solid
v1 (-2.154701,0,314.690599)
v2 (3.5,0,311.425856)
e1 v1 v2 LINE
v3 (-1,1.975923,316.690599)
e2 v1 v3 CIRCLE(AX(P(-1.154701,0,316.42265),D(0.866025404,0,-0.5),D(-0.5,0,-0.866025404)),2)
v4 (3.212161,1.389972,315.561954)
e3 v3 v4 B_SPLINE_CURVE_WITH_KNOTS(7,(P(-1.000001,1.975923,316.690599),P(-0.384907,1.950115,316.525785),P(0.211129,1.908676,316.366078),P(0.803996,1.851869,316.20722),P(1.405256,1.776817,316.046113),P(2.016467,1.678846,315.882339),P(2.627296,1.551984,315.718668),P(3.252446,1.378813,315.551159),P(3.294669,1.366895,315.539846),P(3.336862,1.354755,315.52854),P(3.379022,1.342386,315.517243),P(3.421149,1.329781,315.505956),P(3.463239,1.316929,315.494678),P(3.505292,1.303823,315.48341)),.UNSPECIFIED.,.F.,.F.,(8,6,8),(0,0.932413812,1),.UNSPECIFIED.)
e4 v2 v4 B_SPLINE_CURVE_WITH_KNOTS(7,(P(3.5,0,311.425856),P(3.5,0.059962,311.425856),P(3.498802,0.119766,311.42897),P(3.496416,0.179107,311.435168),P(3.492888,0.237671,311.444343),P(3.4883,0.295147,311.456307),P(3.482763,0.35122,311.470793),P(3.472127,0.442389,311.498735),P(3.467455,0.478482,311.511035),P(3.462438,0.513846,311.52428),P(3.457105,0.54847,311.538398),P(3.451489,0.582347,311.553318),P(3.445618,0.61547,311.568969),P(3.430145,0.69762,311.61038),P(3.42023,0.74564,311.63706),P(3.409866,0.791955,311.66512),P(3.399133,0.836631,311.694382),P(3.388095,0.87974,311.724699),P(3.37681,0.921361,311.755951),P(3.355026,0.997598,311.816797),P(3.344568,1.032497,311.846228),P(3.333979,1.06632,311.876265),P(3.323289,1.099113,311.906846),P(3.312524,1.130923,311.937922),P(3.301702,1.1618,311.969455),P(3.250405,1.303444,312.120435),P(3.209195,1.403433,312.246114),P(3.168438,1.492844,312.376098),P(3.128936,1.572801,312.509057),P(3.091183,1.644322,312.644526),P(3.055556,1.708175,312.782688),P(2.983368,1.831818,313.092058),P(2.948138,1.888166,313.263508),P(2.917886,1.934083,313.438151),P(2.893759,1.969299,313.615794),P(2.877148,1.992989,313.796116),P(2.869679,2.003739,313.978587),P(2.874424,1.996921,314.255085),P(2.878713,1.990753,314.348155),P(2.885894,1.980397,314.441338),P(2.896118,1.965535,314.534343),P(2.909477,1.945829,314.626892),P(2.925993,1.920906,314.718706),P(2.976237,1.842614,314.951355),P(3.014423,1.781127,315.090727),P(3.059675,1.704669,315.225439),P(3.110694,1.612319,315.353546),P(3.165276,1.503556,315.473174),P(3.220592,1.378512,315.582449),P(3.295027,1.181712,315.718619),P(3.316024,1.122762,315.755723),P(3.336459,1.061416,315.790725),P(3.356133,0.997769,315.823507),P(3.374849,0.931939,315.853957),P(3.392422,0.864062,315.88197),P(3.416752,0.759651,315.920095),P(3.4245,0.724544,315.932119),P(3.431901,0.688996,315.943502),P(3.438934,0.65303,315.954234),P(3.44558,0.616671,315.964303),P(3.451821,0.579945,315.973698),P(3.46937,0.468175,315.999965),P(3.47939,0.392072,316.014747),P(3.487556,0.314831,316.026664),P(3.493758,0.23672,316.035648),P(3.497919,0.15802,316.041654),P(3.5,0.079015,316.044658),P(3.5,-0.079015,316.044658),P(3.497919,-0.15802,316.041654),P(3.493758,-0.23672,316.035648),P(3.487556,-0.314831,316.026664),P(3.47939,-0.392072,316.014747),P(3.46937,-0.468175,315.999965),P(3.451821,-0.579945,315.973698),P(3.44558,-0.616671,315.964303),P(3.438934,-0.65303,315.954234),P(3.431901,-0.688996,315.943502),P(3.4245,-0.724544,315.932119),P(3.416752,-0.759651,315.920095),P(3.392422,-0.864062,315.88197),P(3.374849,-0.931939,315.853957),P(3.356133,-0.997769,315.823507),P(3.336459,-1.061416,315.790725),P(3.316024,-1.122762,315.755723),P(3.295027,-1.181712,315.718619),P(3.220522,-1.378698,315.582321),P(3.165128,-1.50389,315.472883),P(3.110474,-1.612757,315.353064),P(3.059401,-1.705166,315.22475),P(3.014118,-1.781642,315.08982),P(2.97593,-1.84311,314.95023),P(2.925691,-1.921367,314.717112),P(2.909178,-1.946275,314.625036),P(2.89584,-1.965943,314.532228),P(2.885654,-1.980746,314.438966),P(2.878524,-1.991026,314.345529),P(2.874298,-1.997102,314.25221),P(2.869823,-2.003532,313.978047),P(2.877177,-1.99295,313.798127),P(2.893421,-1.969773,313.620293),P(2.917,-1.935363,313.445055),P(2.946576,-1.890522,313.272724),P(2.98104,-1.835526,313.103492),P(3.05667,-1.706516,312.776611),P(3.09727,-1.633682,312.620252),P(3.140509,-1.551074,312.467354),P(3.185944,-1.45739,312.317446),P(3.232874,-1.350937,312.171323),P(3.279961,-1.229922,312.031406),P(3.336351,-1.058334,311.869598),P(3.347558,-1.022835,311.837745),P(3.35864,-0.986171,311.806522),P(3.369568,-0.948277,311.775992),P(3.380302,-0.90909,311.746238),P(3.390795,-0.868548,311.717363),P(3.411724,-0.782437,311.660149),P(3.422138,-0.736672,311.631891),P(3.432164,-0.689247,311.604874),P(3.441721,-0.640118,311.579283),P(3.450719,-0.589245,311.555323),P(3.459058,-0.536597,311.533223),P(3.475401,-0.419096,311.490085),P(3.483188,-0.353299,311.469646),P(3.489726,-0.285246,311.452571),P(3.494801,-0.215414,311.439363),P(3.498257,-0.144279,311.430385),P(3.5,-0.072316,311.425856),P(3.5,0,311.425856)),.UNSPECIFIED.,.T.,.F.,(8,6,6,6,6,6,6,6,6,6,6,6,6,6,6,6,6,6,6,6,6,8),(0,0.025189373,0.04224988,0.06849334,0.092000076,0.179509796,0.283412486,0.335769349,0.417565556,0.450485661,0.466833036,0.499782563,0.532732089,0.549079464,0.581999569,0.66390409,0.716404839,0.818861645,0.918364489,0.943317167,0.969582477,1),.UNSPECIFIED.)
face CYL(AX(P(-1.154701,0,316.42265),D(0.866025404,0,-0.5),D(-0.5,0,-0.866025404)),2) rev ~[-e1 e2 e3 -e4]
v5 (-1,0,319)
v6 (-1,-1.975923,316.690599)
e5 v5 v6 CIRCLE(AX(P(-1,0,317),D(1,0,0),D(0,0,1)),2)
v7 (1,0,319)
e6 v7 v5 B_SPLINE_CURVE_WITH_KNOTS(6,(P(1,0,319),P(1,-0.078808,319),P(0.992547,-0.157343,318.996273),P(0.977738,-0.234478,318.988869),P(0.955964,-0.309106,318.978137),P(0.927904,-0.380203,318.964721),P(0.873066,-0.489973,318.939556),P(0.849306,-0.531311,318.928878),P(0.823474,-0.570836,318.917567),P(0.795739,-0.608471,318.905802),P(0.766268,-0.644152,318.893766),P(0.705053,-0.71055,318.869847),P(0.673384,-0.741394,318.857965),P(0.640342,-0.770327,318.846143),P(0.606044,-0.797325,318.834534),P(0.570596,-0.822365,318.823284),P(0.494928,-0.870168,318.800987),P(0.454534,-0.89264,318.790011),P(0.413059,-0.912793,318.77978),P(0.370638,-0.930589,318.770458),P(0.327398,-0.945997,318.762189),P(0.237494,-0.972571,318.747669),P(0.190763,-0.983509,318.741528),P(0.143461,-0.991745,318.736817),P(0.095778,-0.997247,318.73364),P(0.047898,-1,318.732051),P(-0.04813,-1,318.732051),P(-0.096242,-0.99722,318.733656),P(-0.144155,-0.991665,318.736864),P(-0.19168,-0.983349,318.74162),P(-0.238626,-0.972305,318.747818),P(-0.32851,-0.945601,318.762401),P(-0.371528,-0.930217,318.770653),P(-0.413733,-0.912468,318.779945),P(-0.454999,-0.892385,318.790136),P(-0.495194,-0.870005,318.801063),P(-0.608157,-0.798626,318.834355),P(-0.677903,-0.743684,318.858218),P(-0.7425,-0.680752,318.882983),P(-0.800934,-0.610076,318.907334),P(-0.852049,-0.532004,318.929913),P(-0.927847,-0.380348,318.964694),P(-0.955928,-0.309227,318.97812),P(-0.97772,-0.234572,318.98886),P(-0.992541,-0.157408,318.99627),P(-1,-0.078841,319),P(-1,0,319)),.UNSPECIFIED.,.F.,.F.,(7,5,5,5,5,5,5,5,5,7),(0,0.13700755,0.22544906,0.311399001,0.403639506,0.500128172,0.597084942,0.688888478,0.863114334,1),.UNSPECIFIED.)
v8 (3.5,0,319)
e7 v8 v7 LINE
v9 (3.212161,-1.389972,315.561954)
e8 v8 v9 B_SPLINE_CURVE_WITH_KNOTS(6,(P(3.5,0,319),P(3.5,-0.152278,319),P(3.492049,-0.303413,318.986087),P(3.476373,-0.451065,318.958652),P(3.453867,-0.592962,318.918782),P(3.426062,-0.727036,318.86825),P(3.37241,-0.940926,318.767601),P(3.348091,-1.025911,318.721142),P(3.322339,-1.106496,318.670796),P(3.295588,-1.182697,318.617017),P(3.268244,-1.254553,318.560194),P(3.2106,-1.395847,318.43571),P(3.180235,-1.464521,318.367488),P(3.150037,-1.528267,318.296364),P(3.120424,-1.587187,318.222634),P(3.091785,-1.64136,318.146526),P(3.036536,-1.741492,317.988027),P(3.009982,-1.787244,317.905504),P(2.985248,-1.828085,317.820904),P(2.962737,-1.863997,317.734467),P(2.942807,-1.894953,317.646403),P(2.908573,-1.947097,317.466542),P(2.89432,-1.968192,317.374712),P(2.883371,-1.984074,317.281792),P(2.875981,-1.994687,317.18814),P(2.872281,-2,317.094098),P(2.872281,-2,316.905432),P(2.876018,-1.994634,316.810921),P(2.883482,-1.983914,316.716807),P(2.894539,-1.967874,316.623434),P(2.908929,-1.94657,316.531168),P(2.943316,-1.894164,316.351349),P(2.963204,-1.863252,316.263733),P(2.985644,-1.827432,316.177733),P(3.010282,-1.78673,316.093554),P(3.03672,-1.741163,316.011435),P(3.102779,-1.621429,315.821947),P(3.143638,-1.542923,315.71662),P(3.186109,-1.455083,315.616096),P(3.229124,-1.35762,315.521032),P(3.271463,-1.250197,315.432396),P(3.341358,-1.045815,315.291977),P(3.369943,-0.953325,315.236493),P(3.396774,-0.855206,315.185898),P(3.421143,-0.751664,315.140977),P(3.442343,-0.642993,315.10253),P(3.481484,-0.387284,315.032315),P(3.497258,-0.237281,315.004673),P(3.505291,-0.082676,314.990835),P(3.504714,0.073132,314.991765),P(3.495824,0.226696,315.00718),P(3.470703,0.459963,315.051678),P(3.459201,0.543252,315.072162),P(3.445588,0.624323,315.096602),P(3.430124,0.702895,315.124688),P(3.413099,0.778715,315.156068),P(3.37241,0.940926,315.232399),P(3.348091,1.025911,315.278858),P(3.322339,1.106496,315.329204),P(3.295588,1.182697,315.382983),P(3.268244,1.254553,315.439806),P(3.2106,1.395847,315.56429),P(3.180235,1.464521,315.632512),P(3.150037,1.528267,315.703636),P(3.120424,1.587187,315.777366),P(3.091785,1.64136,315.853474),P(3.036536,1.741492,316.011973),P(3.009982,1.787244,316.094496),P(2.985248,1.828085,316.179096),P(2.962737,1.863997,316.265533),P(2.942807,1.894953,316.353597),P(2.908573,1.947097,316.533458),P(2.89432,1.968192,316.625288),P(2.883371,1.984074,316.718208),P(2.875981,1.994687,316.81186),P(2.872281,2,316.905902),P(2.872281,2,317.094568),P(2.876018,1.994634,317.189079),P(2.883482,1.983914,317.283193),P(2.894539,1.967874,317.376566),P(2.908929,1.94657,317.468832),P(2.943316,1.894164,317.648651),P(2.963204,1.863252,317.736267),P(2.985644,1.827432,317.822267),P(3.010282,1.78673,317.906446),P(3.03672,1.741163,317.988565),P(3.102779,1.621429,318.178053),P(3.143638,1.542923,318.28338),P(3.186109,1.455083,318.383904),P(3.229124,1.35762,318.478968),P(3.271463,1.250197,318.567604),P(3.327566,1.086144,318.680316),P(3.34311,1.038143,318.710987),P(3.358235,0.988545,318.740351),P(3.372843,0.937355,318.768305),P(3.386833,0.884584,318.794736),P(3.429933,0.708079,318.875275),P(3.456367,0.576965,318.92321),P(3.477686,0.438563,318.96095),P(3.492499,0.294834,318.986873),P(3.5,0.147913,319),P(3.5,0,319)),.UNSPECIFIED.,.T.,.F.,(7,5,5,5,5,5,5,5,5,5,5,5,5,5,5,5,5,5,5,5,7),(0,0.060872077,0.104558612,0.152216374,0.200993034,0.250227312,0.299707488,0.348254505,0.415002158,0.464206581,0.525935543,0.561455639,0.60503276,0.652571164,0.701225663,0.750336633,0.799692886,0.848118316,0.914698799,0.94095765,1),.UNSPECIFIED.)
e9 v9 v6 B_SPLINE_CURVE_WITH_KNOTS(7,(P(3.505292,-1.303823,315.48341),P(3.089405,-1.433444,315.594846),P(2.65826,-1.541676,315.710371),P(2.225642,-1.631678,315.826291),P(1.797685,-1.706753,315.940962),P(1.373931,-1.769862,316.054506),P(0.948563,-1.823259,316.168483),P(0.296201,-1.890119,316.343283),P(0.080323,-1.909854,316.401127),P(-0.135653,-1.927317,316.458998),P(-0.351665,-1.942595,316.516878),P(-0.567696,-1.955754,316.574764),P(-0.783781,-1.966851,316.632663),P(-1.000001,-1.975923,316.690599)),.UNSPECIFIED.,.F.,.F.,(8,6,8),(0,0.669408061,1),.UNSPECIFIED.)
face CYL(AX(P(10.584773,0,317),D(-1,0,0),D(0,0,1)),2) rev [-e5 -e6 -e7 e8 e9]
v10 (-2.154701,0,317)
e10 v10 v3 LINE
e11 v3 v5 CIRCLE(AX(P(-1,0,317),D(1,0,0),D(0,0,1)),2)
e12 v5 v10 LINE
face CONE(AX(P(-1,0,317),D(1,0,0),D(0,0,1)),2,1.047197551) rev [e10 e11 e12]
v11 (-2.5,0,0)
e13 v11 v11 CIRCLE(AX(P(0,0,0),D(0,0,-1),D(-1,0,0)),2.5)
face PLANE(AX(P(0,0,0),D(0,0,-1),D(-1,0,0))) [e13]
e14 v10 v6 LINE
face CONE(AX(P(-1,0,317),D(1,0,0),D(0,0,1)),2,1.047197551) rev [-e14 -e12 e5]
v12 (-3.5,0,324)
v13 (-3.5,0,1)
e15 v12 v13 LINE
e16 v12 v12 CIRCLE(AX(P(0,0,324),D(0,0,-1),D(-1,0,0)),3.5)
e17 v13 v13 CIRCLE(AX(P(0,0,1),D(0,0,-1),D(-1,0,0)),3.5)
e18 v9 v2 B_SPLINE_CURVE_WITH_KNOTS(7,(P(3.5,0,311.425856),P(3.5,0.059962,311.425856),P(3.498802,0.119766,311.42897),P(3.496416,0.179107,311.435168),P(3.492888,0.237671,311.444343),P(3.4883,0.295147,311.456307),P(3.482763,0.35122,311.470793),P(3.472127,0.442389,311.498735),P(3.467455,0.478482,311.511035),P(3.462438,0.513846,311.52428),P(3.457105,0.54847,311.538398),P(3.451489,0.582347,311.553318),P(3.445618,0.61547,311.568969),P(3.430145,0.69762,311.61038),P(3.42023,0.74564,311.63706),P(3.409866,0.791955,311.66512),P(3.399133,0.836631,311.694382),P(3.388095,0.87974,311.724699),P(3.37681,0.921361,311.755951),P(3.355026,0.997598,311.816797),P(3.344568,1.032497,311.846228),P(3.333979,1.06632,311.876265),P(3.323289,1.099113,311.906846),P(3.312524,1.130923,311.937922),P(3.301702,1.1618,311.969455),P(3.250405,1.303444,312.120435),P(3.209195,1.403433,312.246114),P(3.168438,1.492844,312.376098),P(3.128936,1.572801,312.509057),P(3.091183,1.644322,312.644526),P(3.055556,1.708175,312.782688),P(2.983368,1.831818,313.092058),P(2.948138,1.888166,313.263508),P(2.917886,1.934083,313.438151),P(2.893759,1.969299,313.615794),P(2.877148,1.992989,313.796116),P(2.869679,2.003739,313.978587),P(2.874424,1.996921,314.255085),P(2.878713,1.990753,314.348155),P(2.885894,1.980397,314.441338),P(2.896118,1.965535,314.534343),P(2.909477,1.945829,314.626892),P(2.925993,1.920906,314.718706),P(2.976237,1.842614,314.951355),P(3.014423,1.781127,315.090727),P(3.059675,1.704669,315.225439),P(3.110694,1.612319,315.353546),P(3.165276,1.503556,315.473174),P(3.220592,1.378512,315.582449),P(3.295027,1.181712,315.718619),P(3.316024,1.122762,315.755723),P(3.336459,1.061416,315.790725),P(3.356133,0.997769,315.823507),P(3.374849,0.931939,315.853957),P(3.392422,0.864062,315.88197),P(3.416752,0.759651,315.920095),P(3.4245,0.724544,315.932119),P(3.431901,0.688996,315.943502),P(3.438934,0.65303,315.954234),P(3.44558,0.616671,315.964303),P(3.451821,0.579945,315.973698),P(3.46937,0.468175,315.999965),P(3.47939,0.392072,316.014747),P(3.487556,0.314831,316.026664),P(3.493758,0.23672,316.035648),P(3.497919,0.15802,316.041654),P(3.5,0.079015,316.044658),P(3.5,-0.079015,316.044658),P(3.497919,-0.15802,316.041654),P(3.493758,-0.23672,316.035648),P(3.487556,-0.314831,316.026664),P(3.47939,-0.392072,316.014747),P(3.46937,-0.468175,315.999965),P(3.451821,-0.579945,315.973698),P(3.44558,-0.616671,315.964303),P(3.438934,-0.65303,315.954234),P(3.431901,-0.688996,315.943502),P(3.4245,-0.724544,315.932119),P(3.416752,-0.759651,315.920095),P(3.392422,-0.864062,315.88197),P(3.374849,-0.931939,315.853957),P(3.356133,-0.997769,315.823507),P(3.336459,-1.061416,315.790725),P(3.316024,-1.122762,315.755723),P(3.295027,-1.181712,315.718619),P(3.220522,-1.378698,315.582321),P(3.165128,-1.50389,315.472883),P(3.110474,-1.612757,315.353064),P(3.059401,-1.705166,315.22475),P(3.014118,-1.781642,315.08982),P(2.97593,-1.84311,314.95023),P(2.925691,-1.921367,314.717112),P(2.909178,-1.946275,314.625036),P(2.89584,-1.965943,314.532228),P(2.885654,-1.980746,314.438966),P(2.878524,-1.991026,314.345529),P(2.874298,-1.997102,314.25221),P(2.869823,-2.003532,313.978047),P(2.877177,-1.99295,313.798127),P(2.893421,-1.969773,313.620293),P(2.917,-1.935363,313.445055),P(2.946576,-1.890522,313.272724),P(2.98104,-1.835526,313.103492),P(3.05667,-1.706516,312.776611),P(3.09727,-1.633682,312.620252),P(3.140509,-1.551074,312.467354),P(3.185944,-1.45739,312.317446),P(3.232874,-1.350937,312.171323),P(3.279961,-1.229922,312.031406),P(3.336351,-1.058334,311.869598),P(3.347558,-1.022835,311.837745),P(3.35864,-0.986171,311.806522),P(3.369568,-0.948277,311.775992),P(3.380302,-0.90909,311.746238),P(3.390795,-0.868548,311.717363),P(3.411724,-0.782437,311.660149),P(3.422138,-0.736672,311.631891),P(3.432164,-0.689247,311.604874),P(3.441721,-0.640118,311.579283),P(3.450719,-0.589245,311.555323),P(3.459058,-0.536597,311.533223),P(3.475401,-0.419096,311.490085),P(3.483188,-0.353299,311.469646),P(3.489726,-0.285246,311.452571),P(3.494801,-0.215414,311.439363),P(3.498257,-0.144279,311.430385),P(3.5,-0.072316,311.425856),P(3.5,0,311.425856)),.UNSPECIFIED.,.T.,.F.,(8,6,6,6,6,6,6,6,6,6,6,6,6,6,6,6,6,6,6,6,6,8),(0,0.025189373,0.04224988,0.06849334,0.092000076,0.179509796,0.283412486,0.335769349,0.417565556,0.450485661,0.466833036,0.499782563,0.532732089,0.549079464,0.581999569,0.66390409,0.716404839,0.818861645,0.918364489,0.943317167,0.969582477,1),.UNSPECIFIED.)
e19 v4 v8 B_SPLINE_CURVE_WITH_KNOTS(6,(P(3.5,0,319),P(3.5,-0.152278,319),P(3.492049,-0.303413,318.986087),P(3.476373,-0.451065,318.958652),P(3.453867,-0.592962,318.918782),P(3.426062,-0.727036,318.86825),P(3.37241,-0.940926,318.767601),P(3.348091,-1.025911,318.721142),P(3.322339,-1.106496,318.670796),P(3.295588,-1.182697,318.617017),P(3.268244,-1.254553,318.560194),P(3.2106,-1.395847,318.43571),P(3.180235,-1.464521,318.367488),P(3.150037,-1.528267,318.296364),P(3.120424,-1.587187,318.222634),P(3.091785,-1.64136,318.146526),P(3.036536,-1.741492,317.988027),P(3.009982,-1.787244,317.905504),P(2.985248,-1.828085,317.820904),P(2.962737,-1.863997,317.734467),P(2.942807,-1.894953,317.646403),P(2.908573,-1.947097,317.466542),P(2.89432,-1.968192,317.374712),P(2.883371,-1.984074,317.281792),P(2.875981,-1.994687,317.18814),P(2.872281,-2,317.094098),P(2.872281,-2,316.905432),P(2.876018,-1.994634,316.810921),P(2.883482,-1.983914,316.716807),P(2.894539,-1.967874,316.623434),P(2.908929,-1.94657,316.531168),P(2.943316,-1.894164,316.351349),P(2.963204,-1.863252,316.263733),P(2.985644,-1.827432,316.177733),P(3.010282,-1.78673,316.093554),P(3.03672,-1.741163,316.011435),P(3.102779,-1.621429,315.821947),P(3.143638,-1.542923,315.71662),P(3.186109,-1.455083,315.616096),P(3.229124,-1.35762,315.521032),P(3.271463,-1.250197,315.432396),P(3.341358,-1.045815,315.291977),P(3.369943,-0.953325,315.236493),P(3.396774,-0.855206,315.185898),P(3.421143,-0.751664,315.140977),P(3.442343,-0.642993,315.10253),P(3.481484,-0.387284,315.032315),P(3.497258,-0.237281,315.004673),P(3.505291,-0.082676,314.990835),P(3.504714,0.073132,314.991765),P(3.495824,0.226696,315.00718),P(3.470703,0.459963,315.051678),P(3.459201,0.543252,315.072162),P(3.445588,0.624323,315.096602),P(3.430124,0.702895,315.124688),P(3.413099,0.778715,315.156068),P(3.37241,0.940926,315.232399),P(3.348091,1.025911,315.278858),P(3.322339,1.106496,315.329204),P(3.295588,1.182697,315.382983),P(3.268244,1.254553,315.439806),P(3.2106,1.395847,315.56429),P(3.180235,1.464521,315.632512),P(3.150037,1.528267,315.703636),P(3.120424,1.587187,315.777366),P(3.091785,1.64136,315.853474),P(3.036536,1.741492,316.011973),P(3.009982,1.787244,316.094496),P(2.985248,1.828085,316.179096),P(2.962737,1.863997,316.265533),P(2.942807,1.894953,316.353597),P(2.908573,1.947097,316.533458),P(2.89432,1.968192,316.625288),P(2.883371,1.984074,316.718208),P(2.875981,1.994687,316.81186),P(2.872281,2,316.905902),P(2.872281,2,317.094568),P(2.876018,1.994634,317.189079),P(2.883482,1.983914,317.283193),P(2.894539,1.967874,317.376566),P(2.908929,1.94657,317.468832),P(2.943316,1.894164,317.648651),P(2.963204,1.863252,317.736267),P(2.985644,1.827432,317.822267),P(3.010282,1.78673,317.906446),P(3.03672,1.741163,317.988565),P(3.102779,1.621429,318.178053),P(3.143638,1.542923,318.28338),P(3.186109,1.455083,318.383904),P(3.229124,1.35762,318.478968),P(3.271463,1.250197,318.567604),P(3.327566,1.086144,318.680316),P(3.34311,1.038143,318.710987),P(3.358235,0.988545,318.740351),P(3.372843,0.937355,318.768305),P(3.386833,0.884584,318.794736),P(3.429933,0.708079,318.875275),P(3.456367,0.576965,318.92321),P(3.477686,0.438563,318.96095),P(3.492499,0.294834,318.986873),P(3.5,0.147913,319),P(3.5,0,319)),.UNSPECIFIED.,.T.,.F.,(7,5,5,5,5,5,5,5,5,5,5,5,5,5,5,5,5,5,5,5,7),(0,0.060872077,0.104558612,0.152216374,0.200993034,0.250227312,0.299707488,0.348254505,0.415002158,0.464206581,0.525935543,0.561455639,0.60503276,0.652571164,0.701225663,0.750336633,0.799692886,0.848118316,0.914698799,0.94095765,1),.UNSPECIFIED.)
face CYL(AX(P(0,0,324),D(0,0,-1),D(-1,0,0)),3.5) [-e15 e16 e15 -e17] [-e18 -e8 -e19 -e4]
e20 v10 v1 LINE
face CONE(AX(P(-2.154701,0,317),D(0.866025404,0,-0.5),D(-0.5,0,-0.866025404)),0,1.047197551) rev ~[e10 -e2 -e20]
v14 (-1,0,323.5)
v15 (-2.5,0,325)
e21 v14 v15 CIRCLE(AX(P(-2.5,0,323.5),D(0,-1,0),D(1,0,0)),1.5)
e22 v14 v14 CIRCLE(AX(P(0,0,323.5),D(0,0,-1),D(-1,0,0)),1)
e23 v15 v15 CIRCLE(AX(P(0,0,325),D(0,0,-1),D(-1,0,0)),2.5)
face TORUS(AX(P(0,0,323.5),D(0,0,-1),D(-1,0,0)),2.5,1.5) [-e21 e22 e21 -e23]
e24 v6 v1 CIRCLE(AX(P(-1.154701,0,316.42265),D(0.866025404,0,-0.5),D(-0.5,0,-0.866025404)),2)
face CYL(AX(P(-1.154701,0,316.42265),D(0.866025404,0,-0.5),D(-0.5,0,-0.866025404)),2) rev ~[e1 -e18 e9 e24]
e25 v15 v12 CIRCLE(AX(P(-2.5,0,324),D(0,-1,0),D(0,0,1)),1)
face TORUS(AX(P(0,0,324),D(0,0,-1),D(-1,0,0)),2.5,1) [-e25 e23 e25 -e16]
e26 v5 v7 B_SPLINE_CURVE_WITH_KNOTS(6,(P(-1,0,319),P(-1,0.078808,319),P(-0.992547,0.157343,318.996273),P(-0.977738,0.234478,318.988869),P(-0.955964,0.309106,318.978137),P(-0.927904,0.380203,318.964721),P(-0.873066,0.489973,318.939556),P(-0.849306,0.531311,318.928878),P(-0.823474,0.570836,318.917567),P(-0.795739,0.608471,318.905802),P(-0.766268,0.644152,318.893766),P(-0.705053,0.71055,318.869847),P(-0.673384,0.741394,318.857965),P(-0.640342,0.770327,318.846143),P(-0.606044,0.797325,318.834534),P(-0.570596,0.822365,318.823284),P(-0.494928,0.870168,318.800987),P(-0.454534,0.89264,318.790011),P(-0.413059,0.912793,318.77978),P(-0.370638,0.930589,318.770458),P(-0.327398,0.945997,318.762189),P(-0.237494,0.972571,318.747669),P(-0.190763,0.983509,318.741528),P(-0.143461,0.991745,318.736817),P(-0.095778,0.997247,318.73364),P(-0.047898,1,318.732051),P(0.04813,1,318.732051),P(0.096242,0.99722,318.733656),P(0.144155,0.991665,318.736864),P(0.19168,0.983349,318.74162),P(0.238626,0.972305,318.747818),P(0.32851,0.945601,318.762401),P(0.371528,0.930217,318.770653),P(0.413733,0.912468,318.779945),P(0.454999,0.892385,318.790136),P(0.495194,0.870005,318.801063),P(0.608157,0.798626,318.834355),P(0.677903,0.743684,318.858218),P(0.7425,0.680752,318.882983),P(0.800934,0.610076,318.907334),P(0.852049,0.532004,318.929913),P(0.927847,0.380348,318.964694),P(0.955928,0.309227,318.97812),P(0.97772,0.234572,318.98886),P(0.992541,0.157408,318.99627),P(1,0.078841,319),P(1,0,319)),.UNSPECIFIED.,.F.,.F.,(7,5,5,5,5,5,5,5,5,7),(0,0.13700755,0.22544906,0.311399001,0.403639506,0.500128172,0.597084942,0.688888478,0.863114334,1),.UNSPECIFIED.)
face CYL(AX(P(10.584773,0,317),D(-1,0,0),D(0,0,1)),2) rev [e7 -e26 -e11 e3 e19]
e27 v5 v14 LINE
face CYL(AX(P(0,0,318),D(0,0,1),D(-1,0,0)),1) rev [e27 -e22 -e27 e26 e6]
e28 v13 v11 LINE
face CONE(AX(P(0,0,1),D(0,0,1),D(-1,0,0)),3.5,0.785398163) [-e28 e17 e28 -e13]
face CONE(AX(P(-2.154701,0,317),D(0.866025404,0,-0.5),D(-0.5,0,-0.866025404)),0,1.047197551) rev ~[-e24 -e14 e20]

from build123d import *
from build123d import SkipClean  # not in build123d's __all__


with BuildPart() as f1:
    # F0 (on Front) → F1 (revolve)
    with BuildSketch(Plane.XZ):
        with BuildLine():
            Line((-3.5, 324), (-3.5, 1))
            Line((-3.5, 1), (-2.5, 0))
            Line((-2.5, 0), (0, 0))
            Line((0, 0), (0, 317.4226497308))
            Line((0, 317.4226497308), (-1, 318))
            Line((-1, 318), (-1, 323.5))
            ThreePointArc((-1, 323.5), (-1.4393398282, 324.5606601718), (-2.5, 325))
            ThreePointArc((-2.5, 325), (-3.2071067812, 324.7071067812), (-3.5, 324))
        make_face()
    revolve(axis=Axis((0, 0, 158.7113248654), (0, 0, -1)))

    # F2 (on Front) → F3 (revolve, cut)
    with BuildSketch(Plane.XZ):
        Polygon((-1, 319), (-2.1547005384, 317), (10.5847728806, 317), (10.5847728806, 319), align=None)
    revolve(axis=Axis((7.4317818913, 0, 317), (1, 0, 0)), mode=Mode.SUBTRACT)

    # F4 (on Front) → F5 (revolve, cut)
    with BuildSketch(Plane.XZ):
        Polygon((7.5055534995, 311.4226497308), (1.3094010768, 315), (-1, 315), (-1, 316.3333333333), (-2.1547005384, 317), (-2.1547005384, 314.6905989232), (6.5055534995, 309.6905989232), align=None)
        Polygon((-1, 315), (1.3094010768, 315), (-1, 316.3333333333), align=None)
    with SkipClean():  # cleaning this boolean's faces spoils the solid; the shape is the same uncleaned
        revolve(axis=Axis((2.6754264805, 0, 314.2113248654), (0.8660254038, 0, -0.5)), mode=Mode.SUBTRACT)


solid = f1.part
